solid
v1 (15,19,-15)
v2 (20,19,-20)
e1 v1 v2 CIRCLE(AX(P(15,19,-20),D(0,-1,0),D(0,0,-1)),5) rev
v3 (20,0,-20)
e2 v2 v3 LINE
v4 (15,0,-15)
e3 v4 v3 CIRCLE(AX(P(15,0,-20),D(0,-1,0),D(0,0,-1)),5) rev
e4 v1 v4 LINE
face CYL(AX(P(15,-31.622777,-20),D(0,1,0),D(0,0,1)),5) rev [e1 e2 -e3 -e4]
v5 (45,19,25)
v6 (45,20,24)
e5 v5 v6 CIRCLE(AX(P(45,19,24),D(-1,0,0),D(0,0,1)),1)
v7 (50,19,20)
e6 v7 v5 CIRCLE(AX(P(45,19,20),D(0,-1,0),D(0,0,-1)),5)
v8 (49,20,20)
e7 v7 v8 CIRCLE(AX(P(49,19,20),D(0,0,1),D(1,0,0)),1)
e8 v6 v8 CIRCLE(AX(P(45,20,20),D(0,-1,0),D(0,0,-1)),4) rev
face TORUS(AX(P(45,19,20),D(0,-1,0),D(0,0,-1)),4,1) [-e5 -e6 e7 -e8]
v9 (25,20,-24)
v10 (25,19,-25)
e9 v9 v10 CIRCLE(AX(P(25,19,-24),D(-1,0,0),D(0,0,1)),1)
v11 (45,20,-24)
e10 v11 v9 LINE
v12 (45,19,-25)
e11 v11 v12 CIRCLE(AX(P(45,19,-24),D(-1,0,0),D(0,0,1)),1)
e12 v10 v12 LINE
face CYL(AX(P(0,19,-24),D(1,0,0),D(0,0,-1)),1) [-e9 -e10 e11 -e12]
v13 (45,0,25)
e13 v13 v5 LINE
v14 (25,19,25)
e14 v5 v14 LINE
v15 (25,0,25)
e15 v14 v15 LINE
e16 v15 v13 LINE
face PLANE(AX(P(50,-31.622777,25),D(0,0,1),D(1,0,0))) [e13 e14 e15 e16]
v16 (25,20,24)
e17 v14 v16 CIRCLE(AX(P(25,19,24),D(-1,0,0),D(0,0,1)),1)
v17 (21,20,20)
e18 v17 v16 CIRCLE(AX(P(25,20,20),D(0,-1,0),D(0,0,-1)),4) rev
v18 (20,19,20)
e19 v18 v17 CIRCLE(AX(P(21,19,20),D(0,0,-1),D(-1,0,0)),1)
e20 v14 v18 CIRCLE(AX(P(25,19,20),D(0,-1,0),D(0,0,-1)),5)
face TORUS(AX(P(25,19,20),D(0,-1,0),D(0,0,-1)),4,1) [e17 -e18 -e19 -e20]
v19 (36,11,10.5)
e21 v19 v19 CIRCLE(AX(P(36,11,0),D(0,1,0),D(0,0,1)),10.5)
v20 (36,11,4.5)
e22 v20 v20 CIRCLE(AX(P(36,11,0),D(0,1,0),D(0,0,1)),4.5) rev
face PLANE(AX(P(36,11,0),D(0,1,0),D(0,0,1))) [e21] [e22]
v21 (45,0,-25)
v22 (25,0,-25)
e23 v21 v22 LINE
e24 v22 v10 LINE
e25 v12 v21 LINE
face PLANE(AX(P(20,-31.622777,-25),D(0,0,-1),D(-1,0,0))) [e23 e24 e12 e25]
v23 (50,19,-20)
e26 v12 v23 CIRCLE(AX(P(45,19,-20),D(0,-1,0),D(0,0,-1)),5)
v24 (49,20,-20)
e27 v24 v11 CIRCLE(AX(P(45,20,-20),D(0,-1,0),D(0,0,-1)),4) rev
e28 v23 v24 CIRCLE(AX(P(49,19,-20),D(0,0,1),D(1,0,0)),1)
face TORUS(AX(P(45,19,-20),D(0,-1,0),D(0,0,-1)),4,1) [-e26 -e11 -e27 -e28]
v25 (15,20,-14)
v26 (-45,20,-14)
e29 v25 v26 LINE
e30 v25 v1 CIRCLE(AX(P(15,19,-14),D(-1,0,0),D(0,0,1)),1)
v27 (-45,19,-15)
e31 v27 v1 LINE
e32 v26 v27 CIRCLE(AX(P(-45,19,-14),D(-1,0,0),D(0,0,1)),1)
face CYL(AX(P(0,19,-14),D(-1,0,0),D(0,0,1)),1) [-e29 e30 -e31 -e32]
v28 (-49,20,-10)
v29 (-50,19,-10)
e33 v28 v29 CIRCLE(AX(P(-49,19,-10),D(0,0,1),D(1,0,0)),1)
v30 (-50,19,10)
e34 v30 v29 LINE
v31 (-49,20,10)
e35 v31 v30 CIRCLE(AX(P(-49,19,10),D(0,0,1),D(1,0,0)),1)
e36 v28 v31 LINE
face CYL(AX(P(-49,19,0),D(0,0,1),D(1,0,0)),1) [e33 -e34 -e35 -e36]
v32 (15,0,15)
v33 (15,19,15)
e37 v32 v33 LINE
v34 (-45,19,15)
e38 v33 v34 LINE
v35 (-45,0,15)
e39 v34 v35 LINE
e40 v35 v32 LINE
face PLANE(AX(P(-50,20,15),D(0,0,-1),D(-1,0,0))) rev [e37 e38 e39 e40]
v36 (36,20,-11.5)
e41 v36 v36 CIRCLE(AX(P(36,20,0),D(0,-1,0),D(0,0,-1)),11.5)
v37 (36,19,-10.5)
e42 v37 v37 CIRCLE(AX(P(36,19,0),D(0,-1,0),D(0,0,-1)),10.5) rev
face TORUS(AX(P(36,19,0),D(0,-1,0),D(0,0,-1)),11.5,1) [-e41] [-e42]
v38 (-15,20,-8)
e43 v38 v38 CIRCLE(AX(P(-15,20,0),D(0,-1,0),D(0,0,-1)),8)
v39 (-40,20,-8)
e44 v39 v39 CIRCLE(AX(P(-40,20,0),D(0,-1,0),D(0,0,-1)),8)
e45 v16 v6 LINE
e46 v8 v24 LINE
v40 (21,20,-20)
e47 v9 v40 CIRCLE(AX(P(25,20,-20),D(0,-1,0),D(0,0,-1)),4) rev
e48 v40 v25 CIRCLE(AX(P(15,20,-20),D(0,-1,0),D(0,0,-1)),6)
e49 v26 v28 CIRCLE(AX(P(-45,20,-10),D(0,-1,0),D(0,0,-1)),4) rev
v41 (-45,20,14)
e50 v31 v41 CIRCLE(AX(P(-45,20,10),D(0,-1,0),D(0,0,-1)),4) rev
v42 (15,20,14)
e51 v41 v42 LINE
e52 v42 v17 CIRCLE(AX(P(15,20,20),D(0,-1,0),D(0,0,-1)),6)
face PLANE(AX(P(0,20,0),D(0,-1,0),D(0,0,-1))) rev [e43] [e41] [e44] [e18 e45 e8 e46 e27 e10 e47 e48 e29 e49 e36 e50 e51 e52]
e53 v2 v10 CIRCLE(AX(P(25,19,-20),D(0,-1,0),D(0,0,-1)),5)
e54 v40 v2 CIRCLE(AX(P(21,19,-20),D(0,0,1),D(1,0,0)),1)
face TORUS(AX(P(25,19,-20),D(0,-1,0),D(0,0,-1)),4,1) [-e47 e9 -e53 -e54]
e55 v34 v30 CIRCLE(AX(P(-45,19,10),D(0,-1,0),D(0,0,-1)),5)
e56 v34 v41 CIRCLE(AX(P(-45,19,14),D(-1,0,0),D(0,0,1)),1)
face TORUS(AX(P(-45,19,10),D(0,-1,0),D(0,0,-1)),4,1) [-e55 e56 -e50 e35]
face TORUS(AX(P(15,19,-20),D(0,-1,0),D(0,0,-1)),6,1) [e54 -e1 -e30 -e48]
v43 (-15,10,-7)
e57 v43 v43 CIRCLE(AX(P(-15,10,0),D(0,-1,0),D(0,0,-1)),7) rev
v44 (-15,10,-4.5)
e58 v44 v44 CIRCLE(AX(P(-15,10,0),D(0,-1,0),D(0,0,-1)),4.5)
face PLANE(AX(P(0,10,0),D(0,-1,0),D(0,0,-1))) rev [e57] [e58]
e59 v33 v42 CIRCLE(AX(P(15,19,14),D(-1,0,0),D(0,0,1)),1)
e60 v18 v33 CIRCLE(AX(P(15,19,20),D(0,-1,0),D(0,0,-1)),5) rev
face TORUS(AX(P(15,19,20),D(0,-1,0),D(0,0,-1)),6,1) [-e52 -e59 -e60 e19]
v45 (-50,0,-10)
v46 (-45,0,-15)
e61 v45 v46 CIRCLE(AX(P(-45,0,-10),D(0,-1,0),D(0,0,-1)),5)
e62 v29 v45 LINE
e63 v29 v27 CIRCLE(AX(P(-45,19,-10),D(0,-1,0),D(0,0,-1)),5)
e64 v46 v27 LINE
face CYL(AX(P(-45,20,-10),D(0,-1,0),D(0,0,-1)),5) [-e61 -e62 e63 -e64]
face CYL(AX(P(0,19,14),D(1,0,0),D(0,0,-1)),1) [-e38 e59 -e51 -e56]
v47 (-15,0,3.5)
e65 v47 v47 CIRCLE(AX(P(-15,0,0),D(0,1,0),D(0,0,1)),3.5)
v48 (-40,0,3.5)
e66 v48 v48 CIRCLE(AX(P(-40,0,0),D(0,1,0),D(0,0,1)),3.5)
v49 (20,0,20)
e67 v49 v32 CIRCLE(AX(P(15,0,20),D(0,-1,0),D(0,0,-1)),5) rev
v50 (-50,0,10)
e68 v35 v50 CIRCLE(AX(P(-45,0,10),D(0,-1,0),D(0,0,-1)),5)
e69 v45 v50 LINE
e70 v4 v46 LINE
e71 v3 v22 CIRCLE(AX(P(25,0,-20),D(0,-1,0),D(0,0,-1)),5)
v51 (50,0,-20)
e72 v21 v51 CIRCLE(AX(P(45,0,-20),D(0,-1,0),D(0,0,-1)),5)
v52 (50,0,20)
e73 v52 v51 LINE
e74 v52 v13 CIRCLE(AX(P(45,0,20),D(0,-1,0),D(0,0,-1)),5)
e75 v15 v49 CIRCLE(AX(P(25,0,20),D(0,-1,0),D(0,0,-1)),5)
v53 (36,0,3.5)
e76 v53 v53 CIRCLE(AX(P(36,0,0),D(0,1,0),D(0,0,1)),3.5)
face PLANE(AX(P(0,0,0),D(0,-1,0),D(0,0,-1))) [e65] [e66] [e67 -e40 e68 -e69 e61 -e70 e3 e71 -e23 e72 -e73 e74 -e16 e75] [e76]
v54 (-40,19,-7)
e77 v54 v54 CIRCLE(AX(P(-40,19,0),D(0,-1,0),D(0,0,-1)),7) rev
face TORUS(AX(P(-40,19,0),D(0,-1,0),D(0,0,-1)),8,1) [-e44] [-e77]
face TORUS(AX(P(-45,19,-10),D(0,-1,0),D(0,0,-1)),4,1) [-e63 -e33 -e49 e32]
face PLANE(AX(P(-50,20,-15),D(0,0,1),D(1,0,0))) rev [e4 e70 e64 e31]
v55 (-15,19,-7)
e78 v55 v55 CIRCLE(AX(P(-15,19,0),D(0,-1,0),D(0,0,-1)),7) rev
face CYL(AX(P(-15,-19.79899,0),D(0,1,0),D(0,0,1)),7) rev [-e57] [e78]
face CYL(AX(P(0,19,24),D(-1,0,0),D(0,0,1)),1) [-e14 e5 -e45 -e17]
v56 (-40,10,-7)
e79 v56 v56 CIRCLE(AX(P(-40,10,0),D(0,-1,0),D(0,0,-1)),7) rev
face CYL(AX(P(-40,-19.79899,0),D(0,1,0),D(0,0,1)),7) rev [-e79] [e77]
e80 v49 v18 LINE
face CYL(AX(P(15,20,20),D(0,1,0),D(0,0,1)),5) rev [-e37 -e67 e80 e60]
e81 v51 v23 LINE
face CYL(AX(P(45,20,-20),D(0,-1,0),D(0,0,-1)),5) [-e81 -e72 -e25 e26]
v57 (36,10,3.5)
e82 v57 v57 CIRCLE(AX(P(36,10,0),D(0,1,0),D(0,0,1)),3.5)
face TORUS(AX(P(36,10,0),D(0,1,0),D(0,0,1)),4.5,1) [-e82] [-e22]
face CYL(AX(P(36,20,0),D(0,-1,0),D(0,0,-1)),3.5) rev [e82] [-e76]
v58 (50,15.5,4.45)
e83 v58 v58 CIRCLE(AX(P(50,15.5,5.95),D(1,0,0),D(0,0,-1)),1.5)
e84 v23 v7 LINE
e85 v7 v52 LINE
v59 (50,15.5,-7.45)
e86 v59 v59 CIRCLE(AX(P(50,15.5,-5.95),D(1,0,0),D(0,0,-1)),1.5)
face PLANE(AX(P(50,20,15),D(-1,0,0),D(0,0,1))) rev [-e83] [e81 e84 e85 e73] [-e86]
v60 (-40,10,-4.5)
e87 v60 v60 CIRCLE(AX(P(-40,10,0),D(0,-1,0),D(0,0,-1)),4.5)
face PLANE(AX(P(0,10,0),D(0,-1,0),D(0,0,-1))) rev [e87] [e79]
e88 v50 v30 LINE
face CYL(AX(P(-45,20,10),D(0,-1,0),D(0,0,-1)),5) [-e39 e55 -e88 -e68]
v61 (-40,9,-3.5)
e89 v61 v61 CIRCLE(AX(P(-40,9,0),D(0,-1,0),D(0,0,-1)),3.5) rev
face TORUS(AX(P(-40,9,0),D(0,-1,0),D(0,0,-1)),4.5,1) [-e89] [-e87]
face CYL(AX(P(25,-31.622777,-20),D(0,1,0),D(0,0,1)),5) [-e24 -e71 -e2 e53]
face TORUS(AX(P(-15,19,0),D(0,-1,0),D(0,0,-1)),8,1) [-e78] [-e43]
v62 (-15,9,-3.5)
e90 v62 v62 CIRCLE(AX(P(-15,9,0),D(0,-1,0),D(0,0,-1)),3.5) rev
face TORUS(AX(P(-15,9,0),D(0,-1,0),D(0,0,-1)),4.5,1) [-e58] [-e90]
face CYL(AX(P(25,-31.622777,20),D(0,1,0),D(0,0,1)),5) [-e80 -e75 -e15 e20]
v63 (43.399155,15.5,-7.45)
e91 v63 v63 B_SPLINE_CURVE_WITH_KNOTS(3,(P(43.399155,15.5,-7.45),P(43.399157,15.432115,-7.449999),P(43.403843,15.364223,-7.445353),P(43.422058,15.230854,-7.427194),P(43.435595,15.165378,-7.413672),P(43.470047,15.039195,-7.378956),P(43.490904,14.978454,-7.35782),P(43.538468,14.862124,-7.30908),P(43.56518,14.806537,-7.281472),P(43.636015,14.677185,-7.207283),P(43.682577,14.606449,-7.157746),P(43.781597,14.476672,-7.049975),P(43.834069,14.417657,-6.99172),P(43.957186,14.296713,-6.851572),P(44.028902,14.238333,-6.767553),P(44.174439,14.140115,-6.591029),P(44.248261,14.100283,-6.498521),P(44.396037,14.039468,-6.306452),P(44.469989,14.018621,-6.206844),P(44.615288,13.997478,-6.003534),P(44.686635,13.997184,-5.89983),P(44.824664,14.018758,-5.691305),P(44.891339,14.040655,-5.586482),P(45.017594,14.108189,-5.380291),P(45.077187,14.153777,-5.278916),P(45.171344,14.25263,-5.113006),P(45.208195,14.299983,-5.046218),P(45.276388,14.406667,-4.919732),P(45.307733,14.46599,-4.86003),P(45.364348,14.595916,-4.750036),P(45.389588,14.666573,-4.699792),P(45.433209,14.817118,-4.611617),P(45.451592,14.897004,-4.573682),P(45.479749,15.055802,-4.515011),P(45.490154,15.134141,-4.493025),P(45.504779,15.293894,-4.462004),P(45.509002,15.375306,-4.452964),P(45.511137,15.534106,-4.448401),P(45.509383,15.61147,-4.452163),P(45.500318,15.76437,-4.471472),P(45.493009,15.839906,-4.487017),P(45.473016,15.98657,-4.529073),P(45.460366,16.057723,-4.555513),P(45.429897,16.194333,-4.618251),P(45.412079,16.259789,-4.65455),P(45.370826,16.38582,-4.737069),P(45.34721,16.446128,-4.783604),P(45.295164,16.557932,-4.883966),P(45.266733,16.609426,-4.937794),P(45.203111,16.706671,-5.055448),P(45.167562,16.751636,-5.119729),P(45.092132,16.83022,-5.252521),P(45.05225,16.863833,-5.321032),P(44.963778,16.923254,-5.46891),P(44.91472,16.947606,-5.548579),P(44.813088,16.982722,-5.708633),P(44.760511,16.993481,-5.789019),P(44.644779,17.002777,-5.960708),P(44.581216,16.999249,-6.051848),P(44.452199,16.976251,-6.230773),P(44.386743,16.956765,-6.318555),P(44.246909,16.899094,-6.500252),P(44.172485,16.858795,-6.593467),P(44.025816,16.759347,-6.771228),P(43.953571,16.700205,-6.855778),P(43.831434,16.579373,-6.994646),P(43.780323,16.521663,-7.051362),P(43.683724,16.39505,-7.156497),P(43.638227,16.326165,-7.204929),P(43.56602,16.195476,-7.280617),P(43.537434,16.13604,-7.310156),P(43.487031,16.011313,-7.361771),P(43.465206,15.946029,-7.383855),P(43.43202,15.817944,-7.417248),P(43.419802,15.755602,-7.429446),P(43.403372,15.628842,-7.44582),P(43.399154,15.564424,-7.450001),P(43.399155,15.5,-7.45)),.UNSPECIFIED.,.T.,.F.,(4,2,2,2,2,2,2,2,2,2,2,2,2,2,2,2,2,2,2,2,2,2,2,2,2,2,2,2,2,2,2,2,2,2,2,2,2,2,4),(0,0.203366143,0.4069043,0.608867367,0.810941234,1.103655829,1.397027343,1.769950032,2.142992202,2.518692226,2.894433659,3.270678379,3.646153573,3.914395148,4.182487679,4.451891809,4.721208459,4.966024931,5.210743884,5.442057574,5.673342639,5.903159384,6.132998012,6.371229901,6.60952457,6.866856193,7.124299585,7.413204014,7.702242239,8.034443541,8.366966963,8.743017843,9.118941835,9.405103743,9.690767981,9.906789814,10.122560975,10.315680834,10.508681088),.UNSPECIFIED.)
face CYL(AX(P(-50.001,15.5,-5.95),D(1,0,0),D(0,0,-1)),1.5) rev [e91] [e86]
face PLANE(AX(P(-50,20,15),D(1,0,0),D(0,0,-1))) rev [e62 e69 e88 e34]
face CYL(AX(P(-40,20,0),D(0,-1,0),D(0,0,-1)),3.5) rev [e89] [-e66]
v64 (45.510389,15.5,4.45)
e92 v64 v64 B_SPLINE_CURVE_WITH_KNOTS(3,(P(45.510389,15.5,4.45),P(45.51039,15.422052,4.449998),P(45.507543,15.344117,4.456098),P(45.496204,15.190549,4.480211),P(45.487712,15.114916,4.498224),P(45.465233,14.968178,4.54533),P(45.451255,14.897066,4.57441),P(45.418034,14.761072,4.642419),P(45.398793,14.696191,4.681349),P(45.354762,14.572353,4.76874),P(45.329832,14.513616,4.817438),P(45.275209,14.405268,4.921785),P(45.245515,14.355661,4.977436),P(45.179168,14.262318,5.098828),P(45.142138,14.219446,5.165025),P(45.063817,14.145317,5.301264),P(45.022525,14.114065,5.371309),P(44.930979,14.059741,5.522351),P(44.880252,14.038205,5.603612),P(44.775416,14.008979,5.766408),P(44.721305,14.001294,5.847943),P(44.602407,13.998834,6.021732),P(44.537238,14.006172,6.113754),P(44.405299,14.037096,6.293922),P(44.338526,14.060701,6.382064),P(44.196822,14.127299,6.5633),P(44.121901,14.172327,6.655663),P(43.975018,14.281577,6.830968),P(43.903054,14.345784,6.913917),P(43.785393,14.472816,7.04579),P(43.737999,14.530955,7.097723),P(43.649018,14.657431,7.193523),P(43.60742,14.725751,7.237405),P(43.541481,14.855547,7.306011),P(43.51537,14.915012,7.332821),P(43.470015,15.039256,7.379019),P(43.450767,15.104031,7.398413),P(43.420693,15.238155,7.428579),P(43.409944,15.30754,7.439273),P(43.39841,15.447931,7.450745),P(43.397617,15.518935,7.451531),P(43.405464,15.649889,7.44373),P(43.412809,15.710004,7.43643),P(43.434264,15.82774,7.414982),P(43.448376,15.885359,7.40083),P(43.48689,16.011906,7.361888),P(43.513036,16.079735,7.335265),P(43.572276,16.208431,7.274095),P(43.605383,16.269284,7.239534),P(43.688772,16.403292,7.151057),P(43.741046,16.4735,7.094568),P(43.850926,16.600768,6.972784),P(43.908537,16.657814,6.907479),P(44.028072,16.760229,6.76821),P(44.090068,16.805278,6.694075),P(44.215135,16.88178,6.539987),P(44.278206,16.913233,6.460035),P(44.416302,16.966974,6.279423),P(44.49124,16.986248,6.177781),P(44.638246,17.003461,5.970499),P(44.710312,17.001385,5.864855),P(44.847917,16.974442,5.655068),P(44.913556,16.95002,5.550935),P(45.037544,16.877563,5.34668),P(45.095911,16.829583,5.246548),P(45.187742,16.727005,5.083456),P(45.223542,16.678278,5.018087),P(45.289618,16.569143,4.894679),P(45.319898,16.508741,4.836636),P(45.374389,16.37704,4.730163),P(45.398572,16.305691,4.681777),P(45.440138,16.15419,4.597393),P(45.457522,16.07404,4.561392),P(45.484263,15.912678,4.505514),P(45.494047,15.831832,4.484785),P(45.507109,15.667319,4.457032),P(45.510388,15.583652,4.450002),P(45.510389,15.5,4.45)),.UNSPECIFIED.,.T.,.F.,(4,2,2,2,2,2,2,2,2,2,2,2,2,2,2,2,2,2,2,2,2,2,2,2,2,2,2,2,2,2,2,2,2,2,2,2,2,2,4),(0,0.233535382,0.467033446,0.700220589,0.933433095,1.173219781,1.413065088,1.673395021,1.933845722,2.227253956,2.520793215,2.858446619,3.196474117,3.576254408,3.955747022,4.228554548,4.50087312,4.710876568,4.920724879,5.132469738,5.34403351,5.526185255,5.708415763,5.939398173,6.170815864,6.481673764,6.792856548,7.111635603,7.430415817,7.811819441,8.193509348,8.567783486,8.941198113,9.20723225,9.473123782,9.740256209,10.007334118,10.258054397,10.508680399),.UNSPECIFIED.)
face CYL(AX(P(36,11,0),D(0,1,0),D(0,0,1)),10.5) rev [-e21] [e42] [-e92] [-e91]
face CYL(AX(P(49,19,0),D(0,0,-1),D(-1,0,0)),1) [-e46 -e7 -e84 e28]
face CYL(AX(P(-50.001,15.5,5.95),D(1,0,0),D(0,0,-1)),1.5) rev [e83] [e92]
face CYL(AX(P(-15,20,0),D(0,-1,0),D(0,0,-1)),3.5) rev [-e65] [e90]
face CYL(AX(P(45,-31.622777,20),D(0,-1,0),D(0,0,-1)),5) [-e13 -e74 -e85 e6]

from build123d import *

# Parameters (mm, degrees)
SKETCH1_W               = 100
SKETCH1_H               = 30
SKETCH1_R               = 3.5
BOSS_EXTRUDE1_DEPTH     = 20
SKETCH2_R               = 10.5
CUT_EXTRUDE1_DEPTH      = 9
CUT_EXTRUDE2_REACH      = 105.078
CUT_EXTRUDE2_END_RADIUS = 10.5
SKETCH3_R               = 1.5
SKETCH4_W               = 30
SKETCH4_H               = 10
BOSS_EXTRUDE2_DEPTH     = 20
SKETCH5_R               = 7
CUT_EXTRUDE3_DEPTH      = 10
FILLET1_R               = 5
FILLET2_R               = 1


with BuildPart() as part:
    # Sketch1 → Boss-Extrude1 (new body)
    with BuildSketch(Plane(origin=(0, 0, 0), x_dir=(1, 0, 0), z_dir=(0, 1, 0))):
        Rectangle(SKETCH1_W, SKETCH1_H)
        with Locations(Location((36, 0, 0), (0, 0, 270))):
            Circle(SKETCH1_R, mode=Mode.SUBTRACT)
        with Locations(Location((-40, 0, 0), (0, 0, 270))):
            Circle(SKETCH1_R, mode=Mode.SUBTRACT)
        with Locations(Location((-15, 0, 0), (0, 0, 270))):
            Circle(SKETCH1_R, mode=Mode.SUBTRACT)
    extrude(amount=BOSS_EXTRUDE1_DEPTH)

    # Sketch2 → Cut-Extrude1 (cut)
    with BuildSketch(Plane(origin=(0, 20, 0), x_dir=(1, 0, 0), z_dir=(0, 1, 0))):
        with Locations(Location((36, 0, 0), (0, 0, 270))):
            Circle(SKETCH2_R)
    extrude(amount=-CUT_EXTRUDE1_DEPTH, mode=Mode.SUBTRACT)

    # Cut-Extrude2: up to this cylinder (the profile starts outside it)
    cut_extrude2_end = Plane(origin=(36, 15.5, 0), z_dir=(0, 1, 0)) * Cylinder(CUT_EXTRUDE2_END_RADIUS, 232.156, mode=Mode.PRIVATE)
    # Sketch3 → Cut-Extrude2 (cut, up to the surface)
    with BuildSketch(Plane(origin=(50, 0, 0), x_dir=(0, 0, -1), z_dir=(1, 0, 0)), mode=Mode.PRIVATE) as cut_extrude2_sk1:
        with Locations((-5.95, 15.5)):
            Circle(SKETCH3_R)
    cut_extrude2_tool1 = extrude(cut_extrude2_sk1.sketch, amount=-CUT_EXTRUDE2_REACH, mode=Mode.PRIVATE) - cut_extrude2_end
    add(cut_extrude2_tool1.solids().sort_by_distance((50, 15.5, 5.95))[0], mode=Mode.SUBTRACT)
    # Sketch3 → Cut-Extrude2 (cut, up to the surface)
    with BuildSketch(Plane(origin=(50, 0, 0), x_dir=(0, 0, -1), z_dir=(1, 0, 0)), mode=Mode.PRIVATE) as cut_extrude2_sk2:
        with Locations((5.95, 15.5)):
            Circle(SKETCH3_R)
    cut_extrude2_tool2 = extrude(cut_extrude2_sk2.sketch, amount=-CUT_EXTRUDE2_REACH, mode=Mode.PRIVATE) - cut_extrude2_end
    add(cut_extrude2_tool2.solids().sort_by_distance((50, 15.5, -5.95))[0], mode=Mode.SUBTRACT)

    # Sketch4 → Boss-Extrude2 (add)
    with BuildSketch(Plane(origin=(0, 20, 0), x_dir=(1, 0, 0), z_dir=(0, 1, 0))):
        with Locations((35, 20)):
            Rectangle(SKETCH4_W, SKETCH4_H)
        with Locations((35, -20)):
            Rectangle(SKETCH4_W, SKETCH4_H)
    extrude(amount=-BOSS_EXTRUDE2_DEPTH)

    # Sketch5 → Cut-Extrude3 (cut)
    with BuildSketch(Plane(origin=(0, 20, 0), x_dir=(1, 0, 0), z_dir=(0, 1, 0))):
        with Locations(Location((-40, 0, 0), (0, 0, 270))):
            Circle(SKETCH5_R)
        with Locations(Location((-15, 0, 0), (0, 0, 270))):
            Circle(SKETCH5_R)
    extrude(amount=-CUT_EXTRUDE3_DEPTH, mode=Mode.SUBTRACT)

    # Fillet1
    fillet1_edges = [part.edges().sort_by_distance(p)[0] for p in [
        (-50, 10, -15),
        (-50, 10, 15),
        (50, 10, 25),
        (20, 10, -15),
        (20, 10, 15),
        (20, 10, 25),
        (50, 10, -25),
        (20, 10, -25),
    ]]
    fillet(fillet1_edges, radius=FILLET1_R - 0.0001)  # a hair under: the kernel refuses the full size

    # Fillet2
    fillet2_edges = [part.edges().sort_by_distance(p)[0] for p in [
        (18.535563195, 20, -16.464436805),
        (18.535563195, 20, 16.464436805),
        (36, 11, -3.5),
        (36, 20, -10.5),
        (-40, 10, -3.5),
        (-40, 20, -7),
        (-15, 10, -3.5),
        (-15, 20, -7),
        (35, 20, 25),
        (50, 20, 0),
        (35, 20, -25),
        (-15, 20, -15),
        (-50, 20, 0),
        (-15, 20, 15),
        (21.464436805, 20, -23.535563195),
        (48.535563195, 20, -23.535563195),
        (-48.535563195, 20, 13.535563195),
        (-48.535563195, 20, -13.535563195),
        (21.464436805, 20, 23.535563195),
        (48.535563195, 20, 23.535563195),
    ]]
    fillet(fillet2_edges, radius=FILLET2_R)


solid = part.part
